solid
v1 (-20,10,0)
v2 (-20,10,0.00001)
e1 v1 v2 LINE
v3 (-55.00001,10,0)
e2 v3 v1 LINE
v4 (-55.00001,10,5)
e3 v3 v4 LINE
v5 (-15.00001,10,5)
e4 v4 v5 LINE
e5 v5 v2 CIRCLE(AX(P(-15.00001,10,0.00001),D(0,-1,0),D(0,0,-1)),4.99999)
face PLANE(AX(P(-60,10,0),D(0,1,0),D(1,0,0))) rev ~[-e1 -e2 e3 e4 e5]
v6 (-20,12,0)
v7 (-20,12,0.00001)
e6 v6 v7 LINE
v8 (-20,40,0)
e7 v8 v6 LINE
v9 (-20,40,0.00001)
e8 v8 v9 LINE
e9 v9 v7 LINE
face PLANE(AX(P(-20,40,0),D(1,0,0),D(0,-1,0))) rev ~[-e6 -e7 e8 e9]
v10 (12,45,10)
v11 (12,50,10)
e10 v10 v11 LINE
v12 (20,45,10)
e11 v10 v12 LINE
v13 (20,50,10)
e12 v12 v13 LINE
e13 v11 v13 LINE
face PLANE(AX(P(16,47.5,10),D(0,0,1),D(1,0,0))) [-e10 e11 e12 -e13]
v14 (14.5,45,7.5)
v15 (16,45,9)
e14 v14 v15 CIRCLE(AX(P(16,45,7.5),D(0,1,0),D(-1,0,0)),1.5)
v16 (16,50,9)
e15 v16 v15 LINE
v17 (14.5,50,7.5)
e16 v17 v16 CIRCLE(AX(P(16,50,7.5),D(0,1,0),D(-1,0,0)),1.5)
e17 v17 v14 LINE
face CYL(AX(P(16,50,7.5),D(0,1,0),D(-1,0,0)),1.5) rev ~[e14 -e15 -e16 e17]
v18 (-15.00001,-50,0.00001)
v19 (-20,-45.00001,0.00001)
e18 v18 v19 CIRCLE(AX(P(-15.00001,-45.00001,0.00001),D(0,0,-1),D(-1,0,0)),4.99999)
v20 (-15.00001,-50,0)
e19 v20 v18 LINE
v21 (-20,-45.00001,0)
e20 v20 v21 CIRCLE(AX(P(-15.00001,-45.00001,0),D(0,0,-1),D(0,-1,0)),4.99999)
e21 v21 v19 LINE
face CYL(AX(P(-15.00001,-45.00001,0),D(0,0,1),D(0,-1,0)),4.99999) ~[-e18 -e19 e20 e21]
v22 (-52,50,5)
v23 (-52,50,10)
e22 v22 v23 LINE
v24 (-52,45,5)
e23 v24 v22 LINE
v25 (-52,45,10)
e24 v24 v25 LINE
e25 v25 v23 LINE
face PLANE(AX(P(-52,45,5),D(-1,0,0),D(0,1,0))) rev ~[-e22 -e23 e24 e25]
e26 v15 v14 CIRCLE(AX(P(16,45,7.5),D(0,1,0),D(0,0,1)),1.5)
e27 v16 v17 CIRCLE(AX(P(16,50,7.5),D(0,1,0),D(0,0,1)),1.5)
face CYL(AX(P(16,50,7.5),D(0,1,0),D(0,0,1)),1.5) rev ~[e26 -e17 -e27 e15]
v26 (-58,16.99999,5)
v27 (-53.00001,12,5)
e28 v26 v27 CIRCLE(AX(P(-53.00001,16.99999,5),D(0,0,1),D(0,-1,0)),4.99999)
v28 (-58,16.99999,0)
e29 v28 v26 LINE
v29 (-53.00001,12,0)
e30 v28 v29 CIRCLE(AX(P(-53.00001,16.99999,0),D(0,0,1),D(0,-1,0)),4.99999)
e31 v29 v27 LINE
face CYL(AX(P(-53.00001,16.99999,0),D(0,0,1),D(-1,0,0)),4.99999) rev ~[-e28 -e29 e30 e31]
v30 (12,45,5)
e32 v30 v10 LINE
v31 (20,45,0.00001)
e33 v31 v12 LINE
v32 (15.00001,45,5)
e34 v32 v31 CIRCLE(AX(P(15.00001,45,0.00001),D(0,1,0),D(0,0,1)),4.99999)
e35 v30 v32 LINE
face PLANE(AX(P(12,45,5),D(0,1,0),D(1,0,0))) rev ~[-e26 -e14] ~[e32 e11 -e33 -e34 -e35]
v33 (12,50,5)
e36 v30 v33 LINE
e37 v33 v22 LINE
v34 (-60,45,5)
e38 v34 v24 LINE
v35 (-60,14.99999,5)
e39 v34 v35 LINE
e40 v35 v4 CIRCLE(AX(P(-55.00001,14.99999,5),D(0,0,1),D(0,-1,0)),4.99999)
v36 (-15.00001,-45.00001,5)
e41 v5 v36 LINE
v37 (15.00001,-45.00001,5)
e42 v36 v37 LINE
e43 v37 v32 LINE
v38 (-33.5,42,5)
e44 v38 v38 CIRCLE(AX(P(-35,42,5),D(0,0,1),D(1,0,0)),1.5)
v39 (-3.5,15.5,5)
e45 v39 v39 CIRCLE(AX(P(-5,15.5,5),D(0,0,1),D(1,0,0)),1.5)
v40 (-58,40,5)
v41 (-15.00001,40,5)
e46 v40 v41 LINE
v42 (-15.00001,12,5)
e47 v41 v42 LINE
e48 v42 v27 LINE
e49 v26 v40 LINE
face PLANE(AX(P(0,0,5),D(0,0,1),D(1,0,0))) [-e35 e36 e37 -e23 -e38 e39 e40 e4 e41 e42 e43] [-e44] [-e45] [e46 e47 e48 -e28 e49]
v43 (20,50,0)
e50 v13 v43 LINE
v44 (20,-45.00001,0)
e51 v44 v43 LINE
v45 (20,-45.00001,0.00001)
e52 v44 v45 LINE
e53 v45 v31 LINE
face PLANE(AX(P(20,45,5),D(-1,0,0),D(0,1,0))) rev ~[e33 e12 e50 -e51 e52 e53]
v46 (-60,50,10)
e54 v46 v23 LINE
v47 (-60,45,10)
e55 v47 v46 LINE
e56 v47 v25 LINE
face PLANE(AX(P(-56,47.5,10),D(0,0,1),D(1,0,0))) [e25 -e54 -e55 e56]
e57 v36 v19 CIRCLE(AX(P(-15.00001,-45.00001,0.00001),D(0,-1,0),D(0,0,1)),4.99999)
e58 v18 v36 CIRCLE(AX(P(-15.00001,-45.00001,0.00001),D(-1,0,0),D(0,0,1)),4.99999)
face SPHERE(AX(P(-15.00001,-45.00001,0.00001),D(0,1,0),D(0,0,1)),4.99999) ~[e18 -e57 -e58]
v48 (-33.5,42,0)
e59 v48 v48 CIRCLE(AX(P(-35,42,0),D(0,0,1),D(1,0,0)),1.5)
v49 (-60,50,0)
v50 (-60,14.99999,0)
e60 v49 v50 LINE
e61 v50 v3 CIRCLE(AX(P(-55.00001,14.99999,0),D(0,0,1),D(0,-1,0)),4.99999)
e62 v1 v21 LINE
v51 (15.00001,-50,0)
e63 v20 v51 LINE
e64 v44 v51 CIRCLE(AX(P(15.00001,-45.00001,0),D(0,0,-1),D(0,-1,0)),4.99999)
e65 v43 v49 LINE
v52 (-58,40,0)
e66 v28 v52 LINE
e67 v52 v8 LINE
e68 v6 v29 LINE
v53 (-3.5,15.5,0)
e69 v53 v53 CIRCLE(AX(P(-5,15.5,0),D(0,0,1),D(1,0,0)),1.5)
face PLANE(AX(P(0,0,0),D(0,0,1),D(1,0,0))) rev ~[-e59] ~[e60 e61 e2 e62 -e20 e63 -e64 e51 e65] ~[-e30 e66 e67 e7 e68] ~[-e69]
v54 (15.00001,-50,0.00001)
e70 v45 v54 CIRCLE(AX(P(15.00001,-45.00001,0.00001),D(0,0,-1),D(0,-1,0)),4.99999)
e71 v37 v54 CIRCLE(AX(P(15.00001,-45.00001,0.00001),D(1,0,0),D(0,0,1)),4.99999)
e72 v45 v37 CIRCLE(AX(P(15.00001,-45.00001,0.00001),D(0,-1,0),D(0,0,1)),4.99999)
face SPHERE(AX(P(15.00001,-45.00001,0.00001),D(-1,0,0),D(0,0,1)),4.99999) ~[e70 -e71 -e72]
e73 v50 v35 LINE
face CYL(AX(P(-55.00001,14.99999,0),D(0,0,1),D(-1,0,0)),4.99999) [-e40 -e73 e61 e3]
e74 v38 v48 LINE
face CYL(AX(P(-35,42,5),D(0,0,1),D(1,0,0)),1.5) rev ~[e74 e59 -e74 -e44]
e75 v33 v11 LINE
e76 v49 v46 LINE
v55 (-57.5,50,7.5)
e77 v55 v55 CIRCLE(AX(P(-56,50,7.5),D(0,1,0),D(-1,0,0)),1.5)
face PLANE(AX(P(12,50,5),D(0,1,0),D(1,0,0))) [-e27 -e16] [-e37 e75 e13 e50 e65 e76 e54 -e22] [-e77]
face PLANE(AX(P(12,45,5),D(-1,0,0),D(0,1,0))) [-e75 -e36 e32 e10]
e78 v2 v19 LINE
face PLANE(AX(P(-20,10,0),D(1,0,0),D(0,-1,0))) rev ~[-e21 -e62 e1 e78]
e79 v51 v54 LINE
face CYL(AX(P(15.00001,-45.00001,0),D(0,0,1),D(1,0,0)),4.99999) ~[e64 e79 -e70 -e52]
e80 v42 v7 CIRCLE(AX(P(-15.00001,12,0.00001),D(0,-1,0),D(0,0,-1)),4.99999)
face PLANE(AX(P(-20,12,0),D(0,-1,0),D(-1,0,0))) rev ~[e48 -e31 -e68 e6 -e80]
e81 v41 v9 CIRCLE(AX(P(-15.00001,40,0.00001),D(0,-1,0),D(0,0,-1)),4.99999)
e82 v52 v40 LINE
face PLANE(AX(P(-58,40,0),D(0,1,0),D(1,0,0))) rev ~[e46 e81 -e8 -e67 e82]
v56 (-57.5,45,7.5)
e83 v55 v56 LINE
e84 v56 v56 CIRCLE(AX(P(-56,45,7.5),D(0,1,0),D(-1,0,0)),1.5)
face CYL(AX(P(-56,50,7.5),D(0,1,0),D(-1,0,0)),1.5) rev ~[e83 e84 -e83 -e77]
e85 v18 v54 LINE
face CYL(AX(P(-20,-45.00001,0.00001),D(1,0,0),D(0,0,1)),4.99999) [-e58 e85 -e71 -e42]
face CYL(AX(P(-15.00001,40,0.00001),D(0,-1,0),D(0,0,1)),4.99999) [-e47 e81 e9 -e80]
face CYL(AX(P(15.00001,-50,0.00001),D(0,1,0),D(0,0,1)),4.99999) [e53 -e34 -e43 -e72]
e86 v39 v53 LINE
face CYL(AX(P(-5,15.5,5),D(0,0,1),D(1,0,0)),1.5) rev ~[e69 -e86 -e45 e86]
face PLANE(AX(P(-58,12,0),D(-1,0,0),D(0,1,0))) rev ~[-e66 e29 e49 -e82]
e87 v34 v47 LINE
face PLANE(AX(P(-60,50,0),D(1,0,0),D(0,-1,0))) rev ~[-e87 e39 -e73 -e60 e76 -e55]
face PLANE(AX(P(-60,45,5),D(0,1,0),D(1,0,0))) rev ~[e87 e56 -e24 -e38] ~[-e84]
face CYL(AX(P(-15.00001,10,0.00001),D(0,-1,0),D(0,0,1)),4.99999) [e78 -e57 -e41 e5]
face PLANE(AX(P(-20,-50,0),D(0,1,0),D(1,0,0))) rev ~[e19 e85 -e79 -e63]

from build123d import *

# Parameters (mm, degrees)
F0_W     = 38
F0_H     = 10
F1_DEPTH = 5
F2_R     = 1.5
F3_DEPTH = 5
F4_W     = 8
F4_H     = 5
F5_DEPTH = 5
F6_R     = 1.5
F7_DEPTH = 5
F8_R     = 4.99999


# Not quite as in the source:
# - a fillet or chamfer is up to 0.001 mm smaller than in the source, because OpenCascade refuses the exact size
# - a feature names something its author has since deleted; it is built from what else it names


with BuildPart() as f1:
    # F0 (on Top) → F1 (new body)
    with BuildSketch(Plane.XY):
        Polygon((20, -50), (20, 50), (-20, 50), (-20, 40), (-20, 12), (-20, 10), (-20, -50), align=None)
        with Locations((-39, 45)):
            Rectangle(F0_W, F0_H)
        Polygon((-58, 40), (-58, 50), (-60, 50), (-60, 10), (-20, 10), (-20, 12), (-58, 12), align=None)
    extrude(amount=F1_DEPTH)

    # F2 (on face) → F3 (cut)
    with BuildSketch(Plane.XY.offset(5)):
        with Locations((-35, 42)):
            Circle(F2_R)
        with Locations((-5, 15.5)):
            Circle(F2_R)
    extrude(amount=-F3_DEPTH, mode=Mode.SUBTRACT)

    # F4 (on face) → F5 (join)
    with BuildSketch(Plane.XY.offset(5)):
        with Locations((16, 47.5)):
            Rectangle(F4_W, F4_H)
        with Locations((-56, 47.5)):
            Rectangle(F4_W, F4_H)
    extrude(amount=F5_DEPTH)

    # F6 (on face) → F7 (cut)
    with BuildSketch(Plane(origin=(0, 50, 0), x_dir=(-1, 0, 0), z_dir=(0, 1, 0))):
        with BuildLine():
            ThreePointArc((-14.5, 7.5), (-14.9393398282, 8.5606601718), (-16, 9))
            ThreePointArc((-16, 9), (-17.0606601718, 6.4393398282), (-14.5, 7.5))
        make_face()
        with Locations((56, 7.5)):
            Circle(F6_R)
    extrude(amount=-F7_DEPTH, mode=Mode.SUBTRACT)

    # F8 (radius 5 in the source; OpenCascade refuses exactly that, so slightly less here)
    f8_edges = [f1.edges().sort_by_distance(p)[0] for p in [
        (-60, 10, 2.5),
        (-58, 12, 2.5),
        (-20, -20, 5),
        (-20, 26, 5),
        (0, -50, 5),
        (20, -2.5, 5),
        (-20, -50, 2.5),
        (20, -50, 2.5),
    ]]
    fillet(f8_edges, radius=F8_R)


solid = f1.part
